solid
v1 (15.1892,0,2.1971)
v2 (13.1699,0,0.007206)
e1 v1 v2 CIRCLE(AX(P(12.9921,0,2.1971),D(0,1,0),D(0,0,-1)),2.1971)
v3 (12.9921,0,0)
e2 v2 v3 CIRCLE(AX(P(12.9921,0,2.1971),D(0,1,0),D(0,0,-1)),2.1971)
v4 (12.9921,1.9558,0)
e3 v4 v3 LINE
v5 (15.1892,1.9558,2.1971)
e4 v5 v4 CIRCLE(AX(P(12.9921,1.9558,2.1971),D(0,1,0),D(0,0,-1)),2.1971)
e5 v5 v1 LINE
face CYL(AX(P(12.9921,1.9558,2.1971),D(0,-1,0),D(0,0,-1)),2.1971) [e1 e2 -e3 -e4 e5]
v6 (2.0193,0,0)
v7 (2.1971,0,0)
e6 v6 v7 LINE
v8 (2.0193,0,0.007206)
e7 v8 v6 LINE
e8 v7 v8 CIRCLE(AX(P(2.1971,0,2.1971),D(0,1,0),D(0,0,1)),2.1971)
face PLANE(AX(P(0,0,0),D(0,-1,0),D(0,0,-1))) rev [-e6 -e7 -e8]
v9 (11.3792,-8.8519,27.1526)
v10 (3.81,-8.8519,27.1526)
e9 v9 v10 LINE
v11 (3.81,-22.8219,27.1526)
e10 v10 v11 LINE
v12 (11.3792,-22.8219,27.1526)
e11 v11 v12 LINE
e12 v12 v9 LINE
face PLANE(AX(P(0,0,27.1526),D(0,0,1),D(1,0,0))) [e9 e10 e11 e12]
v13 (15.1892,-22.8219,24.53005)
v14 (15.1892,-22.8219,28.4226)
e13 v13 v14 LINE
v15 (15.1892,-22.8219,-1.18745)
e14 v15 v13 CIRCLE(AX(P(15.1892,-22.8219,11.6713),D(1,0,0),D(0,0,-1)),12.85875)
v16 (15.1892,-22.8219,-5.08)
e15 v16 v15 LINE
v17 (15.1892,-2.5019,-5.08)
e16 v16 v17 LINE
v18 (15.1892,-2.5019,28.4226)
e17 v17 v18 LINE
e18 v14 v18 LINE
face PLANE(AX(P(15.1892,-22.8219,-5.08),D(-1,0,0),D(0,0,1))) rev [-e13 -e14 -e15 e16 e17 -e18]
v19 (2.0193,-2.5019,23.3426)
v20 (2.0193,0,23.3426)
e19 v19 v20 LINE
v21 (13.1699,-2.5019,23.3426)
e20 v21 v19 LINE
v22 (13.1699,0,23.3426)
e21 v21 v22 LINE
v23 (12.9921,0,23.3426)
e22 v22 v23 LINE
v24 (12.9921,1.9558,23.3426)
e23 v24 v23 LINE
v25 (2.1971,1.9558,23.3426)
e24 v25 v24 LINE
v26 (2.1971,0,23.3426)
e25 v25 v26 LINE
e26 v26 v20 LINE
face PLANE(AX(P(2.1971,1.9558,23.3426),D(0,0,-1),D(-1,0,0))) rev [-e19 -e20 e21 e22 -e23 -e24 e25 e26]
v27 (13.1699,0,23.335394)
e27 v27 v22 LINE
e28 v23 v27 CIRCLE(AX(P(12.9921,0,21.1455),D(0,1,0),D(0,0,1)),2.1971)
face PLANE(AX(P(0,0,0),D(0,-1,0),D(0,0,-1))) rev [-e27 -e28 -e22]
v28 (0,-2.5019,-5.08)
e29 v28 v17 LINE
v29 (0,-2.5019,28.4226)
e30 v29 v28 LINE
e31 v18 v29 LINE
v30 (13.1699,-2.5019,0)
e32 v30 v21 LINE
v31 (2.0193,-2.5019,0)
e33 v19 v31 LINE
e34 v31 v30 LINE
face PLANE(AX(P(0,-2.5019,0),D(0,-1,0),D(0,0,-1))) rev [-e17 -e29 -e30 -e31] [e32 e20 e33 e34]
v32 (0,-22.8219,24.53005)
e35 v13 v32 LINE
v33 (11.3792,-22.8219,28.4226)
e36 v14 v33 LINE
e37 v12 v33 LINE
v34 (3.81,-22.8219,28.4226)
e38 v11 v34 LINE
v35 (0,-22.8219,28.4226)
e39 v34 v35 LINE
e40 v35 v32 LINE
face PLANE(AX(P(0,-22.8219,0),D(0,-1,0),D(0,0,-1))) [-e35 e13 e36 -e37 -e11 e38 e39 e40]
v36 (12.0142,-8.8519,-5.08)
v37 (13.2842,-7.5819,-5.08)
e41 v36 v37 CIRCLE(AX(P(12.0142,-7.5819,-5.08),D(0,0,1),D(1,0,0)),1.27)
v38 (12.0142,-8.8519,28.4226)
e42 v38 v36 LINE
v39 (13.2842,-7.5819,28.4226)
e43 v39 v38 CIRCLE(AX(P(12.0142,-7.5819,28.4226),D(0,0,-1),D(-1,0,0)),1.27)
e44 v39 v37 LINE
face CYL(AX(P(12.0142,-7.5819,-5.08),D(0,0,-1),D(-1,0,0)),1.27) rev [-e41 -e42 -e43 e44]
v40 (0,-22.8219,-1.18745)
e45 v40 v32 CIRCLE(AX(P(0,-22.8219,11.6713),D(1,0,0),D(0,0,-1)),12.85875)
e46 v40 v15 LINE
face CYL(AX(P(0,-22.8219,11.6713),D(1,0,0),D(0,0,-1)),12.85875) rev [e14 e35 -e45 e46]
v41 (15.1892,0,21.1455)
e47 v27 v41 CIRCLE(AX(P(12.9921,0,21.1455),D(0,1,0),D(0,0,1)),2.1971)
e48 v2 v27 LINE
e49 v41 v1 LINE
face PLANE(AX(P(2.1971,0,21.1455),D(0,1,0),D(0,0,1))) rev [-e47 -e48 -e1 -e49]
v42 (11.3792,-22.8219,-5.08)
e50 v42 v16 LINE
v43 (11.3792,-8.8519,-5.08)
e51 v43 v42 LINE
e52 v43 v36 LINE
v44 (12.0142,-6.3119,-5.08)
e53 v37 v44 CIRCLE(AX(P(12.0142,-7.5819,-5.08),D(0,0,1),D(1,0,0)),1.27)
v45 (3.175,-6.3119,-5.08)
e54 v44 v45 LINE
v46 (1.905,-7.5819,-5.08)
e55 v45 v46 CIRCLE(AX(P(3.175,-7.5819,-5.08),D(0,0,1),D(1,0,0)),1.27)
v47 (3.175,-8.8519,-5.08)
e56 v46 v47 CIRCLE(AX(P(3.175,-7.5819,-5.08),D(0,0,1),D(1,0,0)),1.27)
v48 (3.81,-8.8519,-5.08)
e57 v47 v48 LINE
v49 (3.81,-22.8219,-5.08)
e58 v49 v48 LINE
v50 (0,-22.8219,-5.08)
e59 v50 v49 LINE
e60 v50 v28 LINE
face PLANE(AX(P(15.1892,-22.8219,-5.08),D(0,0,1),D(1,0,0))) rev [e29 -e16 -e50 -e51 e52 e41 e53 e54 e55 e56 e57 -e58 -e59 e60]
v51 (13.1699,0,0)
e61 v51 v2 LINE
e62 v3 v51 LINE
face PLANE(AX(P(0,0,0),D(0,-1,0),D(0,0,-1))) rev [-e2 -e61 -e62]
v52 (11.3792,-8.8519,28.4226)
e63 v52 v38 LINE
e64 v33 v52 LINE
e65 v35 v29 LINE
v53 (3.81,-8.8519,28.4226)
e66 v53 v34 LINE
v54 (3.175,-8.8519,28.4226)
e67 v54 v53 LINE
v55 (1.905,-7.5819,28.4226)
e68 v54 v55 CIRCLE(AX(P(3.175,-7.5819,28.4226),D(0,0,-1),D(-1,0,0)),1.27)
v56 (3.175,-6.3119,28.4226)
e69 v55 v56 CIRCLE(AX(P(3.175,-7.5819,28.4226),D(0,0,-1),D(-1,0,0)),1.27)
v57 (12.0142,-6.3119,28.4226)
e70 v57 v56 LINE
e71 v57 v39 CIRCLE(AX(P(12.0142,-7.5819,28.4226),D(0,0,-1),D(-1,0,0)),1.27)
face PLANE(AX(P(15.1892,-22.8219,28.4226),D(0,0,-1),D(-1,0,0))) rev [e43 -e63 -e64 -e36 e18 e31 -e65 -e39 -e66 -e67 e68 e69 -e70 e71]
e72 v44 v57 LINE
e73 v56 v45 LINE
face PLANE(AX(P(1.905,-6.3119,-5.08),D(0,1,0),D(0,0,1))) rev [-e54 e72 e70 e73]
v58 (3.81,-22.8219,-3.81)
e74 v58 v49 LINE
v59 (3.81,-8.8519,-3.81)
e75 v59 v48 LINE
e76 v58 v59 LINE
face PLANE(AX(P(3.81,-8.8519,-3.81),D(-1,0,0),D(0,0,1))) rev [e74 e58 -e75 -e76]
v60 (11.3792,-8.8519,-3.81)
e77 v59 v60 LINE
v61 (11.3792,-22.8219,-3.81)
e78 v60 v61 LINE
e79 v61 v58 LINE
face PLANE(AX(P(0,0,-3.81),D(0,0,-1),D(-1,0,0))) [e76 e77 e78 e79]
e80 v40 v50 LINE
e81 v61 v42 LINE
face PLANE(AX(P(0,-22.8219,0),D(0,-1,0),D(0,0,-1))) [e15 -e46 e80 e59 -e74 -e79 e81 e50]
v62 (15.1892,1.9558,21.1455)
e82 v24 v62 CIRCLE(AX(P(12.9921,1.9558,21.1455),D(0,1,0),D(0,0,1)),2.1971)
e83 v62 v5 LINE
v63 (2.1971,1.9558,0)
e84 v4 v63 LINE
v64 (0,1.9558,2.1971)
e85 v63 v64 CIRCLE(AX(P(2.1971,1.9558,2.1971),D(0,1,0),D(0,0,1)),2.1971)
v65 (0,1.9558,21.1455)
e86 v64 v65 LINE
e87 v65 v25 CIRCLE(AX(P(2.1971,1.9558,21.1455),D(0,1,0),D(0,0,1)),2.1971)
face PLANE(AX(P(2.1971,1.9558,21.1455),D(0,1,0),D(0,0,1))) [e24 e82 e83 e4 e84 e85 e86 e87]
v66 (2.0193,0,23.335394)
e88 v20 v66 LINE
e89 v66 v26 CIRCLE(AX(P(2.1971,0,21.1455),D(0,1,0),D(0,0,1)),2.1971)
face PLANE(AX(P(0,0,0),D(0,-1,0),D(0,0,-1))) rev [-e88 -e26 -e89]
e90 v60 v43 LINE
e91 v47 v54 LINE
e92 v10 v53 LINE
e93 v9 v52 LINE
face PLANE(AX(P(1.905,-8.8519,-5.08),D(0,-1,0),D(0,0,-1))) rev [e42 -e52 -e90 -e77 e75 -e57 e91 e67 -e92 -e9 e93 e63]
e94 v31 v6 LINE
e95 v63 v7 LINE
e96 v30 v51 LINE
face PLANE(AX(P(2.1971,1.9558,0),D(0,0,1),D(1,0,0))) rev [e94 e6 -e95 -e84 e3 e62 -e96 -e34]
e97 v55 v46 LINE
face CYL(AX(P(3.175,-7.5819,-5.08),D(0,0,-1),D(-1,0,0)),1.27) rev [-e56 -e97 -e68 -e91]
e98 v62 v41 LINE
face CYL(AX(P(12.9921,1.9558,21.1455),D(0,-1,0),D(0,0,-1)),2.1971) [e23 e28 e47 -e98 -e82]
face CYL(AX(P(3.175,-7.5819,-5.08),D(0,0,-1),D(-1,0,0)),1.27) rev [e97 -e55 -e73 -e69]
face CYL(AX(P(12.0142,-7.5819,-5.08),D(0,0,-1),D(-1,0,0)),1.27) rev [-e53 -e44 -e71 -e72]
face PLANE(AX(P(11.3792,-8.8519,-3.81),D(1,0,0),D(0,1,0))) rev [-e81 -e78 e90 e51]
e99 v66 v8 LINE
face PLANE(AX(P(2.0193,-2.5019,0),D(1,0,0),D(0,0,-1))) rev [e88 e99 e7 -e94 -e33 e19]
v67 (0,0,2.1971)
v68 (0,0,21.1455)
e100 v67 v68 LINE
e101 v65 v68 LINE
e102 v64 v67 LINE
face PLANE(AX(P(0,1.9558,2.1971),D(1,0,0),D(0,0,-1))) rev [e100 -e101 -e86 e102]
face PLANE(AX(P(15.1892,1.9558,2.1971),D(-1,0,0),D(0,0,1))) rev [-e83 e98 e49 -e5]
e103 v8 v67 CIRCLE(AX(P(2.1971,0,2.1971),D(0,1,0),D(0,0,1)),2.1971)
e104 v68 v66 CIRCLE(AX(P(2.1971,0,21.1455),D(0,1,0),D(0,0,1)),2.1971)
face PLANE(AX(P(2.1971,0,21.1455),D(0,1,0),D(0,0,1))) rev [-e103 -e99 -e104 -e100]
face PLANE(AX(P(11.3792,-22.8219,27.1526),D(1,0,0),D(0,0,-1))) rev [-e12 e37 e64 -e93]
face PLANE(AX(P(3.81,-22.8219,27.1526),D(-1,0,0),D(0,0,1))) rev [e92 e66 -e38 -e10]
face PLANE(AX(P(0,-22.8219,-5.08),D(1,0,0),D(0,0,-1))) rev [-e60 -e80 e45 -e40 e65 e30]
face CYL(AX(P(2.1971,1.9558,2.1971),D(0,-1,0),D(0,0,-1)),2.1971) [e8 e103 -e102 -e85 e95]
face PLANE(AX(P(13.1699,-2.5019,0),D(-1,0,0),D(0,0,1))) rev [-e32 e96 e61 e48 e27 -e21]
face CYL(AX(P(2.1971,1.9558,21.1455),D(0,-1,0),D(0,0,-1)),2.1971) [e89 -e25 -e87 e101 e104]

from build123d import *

# Parameters (mm, degrees)
BOSS_EXTRUDE1_DEPTH = 1.9558
SKETCH2_W           = 11.1506
SKETCH2_H           = 23.3426
BOSS_EXTRUDE2_DEPTH = 2.5019
SKETCH3_W           = 15.1892
SKETCH3_H           = 33.5026
BOSS_EXTRUDE3_DEPTH = 20.32
SKETCH4_R           = 12.85875
CUT_EXTRUDE1_DEPTH  = 40.489177087
SKETCH5_W           = 11.3792
SKETCH5_H           = 2.54
CUT_EXTRUDE2_DEPTH  = 44.289434312
FILLET1_R           = 1.27
SKETCH6_W           = 7.5692
SKETCH6_H           = 13.97
CUT_EXTRUDE3_DEPTH  = 1.27
SKETCH7_W           = 7.5692
SKETCH7_H           = 13.97
CUT_EXTRUDE4_DEPTH  = 1.27


with BuildPart() as part:
    # Sketch1 → Boss-Extrude1 (new body)
    with BuildSketch(Plane(origin=(0, 0, 0), x_dir=(1, 0, 0), z_dir=(0, 1, 0))):
        with BuildLine():
            Line((2.1971, 0), (12.9921, 0))
            ThreePointArc((12.9921, 0), (14.545684309, -0.643515691), (15.1892, -2.1971))
            Line((15.1892, -2.1971), (15.1892, -21.1455))
            ThreePointArc((15.1892, -21.1455), (14.545684309, -22.699084309), (12.9921, -23.3426))
            Line((12.9921, -23.3426), (2.1971, -23.3426))
            ThreePointArc((2.1971, -23.3426), (0.643515691, -22.699084309), (0, -21.1455))
            Line((0, -21.1455), (0, -2.1971))
            ThreePointArc((0, -2.1971), (0.643515691, -0.643515691), (2.1971, 0))
        make_face()
    extrude(amount=BOSS_EXTRUDE1_DEPTH)

    # Sketch2 → Boss-Extrude2 (add)
    with BuildSketch(Plane.XZ):
        with Locations((7.5946, 11.6713)):
            Rectangle(SKETCH2_W, SKETCH2_H)
    extrude(amount=BOSS_EXTRUDE2_DEPTH)

    # Sketch3 → Boss-Extrude3 (add)
    with BuildSketch(Plane.XZ.offset(2.5019)):
        with Locations((7.5946, 11.6713)):
            Rectangle(SKETCH3_W, SKETCH3_H)
    extrude(amount=BOSS_EXTRUDE3_DEPTH)

    # Sketch4 → Cut-Extrude1 (cut, through all)
    with BuildSketch(Plane(origin=(15.1892, 0, 0), x_dir=(0, 0, -1), z_dir=(1, 0, 0))):
        with Locations((-11.6713, -22.8219)):
            Circle(SKETCH4_R)
    extrude(amount=-CUT_EXTRUDE1_DEPTH, mode=Mode.SUBTRACT)

    # Sketch5 → Cut-Extrude2 (cut, through all)
    with BuildSketch(Plane.XY.offset(28.4226)):
        with Locations((7.5946, -7.5819)):
            Rectangle(SKETCH5_W, SKETCH5_H)
    extrude(amount=-CUT_EXTRUDE2_DEPTH, mode=Mode.SUBTRACT)

    # Fillet1
    fillet1_edges = [part.edges().sort_by_distance(p)[0] for p in [
        (13.2842, -8.8519, 11.6713),
        (13.2842, -6.3119, 11.6713),
        (1.905, -6.3119, 11.6713),
        (1.905, -8.8519, 11.6713),
    ]]
    fillet(fillet1_edges, radius=FILLET1_R - 0.0001)  # a hair under: the kernel refuses the full size

    # Sketch6 → Cut-Extrude3 (cut)
    with BuildSketch(Plane(origin=(0, 0, -5.08), x_dir=(-1, 0, 0), z_dir=(0, 0, -1))):
        with Locations((-7.5946, -15.8369)):
            Rectangle(SKETCH6_W, SKETCH6_H)
    extrude(amount=-CUT_EXTRUDE3_DEPTH, mode=Mode.SUBTRACT)

    # Sketch7 → Cut-Extrude4 (cut)
    with BuildSketch(Plane.XY.offset(28.4226)):
        with Locations((7.5946, -15.8369)):
            Rectangle(SKETCH7_W, SKETCH7_H)
    extrude(amount=-CUT_EXTRUDE4_DEPTH, mode=Mode.SUBTRACT)


solid = part.part
